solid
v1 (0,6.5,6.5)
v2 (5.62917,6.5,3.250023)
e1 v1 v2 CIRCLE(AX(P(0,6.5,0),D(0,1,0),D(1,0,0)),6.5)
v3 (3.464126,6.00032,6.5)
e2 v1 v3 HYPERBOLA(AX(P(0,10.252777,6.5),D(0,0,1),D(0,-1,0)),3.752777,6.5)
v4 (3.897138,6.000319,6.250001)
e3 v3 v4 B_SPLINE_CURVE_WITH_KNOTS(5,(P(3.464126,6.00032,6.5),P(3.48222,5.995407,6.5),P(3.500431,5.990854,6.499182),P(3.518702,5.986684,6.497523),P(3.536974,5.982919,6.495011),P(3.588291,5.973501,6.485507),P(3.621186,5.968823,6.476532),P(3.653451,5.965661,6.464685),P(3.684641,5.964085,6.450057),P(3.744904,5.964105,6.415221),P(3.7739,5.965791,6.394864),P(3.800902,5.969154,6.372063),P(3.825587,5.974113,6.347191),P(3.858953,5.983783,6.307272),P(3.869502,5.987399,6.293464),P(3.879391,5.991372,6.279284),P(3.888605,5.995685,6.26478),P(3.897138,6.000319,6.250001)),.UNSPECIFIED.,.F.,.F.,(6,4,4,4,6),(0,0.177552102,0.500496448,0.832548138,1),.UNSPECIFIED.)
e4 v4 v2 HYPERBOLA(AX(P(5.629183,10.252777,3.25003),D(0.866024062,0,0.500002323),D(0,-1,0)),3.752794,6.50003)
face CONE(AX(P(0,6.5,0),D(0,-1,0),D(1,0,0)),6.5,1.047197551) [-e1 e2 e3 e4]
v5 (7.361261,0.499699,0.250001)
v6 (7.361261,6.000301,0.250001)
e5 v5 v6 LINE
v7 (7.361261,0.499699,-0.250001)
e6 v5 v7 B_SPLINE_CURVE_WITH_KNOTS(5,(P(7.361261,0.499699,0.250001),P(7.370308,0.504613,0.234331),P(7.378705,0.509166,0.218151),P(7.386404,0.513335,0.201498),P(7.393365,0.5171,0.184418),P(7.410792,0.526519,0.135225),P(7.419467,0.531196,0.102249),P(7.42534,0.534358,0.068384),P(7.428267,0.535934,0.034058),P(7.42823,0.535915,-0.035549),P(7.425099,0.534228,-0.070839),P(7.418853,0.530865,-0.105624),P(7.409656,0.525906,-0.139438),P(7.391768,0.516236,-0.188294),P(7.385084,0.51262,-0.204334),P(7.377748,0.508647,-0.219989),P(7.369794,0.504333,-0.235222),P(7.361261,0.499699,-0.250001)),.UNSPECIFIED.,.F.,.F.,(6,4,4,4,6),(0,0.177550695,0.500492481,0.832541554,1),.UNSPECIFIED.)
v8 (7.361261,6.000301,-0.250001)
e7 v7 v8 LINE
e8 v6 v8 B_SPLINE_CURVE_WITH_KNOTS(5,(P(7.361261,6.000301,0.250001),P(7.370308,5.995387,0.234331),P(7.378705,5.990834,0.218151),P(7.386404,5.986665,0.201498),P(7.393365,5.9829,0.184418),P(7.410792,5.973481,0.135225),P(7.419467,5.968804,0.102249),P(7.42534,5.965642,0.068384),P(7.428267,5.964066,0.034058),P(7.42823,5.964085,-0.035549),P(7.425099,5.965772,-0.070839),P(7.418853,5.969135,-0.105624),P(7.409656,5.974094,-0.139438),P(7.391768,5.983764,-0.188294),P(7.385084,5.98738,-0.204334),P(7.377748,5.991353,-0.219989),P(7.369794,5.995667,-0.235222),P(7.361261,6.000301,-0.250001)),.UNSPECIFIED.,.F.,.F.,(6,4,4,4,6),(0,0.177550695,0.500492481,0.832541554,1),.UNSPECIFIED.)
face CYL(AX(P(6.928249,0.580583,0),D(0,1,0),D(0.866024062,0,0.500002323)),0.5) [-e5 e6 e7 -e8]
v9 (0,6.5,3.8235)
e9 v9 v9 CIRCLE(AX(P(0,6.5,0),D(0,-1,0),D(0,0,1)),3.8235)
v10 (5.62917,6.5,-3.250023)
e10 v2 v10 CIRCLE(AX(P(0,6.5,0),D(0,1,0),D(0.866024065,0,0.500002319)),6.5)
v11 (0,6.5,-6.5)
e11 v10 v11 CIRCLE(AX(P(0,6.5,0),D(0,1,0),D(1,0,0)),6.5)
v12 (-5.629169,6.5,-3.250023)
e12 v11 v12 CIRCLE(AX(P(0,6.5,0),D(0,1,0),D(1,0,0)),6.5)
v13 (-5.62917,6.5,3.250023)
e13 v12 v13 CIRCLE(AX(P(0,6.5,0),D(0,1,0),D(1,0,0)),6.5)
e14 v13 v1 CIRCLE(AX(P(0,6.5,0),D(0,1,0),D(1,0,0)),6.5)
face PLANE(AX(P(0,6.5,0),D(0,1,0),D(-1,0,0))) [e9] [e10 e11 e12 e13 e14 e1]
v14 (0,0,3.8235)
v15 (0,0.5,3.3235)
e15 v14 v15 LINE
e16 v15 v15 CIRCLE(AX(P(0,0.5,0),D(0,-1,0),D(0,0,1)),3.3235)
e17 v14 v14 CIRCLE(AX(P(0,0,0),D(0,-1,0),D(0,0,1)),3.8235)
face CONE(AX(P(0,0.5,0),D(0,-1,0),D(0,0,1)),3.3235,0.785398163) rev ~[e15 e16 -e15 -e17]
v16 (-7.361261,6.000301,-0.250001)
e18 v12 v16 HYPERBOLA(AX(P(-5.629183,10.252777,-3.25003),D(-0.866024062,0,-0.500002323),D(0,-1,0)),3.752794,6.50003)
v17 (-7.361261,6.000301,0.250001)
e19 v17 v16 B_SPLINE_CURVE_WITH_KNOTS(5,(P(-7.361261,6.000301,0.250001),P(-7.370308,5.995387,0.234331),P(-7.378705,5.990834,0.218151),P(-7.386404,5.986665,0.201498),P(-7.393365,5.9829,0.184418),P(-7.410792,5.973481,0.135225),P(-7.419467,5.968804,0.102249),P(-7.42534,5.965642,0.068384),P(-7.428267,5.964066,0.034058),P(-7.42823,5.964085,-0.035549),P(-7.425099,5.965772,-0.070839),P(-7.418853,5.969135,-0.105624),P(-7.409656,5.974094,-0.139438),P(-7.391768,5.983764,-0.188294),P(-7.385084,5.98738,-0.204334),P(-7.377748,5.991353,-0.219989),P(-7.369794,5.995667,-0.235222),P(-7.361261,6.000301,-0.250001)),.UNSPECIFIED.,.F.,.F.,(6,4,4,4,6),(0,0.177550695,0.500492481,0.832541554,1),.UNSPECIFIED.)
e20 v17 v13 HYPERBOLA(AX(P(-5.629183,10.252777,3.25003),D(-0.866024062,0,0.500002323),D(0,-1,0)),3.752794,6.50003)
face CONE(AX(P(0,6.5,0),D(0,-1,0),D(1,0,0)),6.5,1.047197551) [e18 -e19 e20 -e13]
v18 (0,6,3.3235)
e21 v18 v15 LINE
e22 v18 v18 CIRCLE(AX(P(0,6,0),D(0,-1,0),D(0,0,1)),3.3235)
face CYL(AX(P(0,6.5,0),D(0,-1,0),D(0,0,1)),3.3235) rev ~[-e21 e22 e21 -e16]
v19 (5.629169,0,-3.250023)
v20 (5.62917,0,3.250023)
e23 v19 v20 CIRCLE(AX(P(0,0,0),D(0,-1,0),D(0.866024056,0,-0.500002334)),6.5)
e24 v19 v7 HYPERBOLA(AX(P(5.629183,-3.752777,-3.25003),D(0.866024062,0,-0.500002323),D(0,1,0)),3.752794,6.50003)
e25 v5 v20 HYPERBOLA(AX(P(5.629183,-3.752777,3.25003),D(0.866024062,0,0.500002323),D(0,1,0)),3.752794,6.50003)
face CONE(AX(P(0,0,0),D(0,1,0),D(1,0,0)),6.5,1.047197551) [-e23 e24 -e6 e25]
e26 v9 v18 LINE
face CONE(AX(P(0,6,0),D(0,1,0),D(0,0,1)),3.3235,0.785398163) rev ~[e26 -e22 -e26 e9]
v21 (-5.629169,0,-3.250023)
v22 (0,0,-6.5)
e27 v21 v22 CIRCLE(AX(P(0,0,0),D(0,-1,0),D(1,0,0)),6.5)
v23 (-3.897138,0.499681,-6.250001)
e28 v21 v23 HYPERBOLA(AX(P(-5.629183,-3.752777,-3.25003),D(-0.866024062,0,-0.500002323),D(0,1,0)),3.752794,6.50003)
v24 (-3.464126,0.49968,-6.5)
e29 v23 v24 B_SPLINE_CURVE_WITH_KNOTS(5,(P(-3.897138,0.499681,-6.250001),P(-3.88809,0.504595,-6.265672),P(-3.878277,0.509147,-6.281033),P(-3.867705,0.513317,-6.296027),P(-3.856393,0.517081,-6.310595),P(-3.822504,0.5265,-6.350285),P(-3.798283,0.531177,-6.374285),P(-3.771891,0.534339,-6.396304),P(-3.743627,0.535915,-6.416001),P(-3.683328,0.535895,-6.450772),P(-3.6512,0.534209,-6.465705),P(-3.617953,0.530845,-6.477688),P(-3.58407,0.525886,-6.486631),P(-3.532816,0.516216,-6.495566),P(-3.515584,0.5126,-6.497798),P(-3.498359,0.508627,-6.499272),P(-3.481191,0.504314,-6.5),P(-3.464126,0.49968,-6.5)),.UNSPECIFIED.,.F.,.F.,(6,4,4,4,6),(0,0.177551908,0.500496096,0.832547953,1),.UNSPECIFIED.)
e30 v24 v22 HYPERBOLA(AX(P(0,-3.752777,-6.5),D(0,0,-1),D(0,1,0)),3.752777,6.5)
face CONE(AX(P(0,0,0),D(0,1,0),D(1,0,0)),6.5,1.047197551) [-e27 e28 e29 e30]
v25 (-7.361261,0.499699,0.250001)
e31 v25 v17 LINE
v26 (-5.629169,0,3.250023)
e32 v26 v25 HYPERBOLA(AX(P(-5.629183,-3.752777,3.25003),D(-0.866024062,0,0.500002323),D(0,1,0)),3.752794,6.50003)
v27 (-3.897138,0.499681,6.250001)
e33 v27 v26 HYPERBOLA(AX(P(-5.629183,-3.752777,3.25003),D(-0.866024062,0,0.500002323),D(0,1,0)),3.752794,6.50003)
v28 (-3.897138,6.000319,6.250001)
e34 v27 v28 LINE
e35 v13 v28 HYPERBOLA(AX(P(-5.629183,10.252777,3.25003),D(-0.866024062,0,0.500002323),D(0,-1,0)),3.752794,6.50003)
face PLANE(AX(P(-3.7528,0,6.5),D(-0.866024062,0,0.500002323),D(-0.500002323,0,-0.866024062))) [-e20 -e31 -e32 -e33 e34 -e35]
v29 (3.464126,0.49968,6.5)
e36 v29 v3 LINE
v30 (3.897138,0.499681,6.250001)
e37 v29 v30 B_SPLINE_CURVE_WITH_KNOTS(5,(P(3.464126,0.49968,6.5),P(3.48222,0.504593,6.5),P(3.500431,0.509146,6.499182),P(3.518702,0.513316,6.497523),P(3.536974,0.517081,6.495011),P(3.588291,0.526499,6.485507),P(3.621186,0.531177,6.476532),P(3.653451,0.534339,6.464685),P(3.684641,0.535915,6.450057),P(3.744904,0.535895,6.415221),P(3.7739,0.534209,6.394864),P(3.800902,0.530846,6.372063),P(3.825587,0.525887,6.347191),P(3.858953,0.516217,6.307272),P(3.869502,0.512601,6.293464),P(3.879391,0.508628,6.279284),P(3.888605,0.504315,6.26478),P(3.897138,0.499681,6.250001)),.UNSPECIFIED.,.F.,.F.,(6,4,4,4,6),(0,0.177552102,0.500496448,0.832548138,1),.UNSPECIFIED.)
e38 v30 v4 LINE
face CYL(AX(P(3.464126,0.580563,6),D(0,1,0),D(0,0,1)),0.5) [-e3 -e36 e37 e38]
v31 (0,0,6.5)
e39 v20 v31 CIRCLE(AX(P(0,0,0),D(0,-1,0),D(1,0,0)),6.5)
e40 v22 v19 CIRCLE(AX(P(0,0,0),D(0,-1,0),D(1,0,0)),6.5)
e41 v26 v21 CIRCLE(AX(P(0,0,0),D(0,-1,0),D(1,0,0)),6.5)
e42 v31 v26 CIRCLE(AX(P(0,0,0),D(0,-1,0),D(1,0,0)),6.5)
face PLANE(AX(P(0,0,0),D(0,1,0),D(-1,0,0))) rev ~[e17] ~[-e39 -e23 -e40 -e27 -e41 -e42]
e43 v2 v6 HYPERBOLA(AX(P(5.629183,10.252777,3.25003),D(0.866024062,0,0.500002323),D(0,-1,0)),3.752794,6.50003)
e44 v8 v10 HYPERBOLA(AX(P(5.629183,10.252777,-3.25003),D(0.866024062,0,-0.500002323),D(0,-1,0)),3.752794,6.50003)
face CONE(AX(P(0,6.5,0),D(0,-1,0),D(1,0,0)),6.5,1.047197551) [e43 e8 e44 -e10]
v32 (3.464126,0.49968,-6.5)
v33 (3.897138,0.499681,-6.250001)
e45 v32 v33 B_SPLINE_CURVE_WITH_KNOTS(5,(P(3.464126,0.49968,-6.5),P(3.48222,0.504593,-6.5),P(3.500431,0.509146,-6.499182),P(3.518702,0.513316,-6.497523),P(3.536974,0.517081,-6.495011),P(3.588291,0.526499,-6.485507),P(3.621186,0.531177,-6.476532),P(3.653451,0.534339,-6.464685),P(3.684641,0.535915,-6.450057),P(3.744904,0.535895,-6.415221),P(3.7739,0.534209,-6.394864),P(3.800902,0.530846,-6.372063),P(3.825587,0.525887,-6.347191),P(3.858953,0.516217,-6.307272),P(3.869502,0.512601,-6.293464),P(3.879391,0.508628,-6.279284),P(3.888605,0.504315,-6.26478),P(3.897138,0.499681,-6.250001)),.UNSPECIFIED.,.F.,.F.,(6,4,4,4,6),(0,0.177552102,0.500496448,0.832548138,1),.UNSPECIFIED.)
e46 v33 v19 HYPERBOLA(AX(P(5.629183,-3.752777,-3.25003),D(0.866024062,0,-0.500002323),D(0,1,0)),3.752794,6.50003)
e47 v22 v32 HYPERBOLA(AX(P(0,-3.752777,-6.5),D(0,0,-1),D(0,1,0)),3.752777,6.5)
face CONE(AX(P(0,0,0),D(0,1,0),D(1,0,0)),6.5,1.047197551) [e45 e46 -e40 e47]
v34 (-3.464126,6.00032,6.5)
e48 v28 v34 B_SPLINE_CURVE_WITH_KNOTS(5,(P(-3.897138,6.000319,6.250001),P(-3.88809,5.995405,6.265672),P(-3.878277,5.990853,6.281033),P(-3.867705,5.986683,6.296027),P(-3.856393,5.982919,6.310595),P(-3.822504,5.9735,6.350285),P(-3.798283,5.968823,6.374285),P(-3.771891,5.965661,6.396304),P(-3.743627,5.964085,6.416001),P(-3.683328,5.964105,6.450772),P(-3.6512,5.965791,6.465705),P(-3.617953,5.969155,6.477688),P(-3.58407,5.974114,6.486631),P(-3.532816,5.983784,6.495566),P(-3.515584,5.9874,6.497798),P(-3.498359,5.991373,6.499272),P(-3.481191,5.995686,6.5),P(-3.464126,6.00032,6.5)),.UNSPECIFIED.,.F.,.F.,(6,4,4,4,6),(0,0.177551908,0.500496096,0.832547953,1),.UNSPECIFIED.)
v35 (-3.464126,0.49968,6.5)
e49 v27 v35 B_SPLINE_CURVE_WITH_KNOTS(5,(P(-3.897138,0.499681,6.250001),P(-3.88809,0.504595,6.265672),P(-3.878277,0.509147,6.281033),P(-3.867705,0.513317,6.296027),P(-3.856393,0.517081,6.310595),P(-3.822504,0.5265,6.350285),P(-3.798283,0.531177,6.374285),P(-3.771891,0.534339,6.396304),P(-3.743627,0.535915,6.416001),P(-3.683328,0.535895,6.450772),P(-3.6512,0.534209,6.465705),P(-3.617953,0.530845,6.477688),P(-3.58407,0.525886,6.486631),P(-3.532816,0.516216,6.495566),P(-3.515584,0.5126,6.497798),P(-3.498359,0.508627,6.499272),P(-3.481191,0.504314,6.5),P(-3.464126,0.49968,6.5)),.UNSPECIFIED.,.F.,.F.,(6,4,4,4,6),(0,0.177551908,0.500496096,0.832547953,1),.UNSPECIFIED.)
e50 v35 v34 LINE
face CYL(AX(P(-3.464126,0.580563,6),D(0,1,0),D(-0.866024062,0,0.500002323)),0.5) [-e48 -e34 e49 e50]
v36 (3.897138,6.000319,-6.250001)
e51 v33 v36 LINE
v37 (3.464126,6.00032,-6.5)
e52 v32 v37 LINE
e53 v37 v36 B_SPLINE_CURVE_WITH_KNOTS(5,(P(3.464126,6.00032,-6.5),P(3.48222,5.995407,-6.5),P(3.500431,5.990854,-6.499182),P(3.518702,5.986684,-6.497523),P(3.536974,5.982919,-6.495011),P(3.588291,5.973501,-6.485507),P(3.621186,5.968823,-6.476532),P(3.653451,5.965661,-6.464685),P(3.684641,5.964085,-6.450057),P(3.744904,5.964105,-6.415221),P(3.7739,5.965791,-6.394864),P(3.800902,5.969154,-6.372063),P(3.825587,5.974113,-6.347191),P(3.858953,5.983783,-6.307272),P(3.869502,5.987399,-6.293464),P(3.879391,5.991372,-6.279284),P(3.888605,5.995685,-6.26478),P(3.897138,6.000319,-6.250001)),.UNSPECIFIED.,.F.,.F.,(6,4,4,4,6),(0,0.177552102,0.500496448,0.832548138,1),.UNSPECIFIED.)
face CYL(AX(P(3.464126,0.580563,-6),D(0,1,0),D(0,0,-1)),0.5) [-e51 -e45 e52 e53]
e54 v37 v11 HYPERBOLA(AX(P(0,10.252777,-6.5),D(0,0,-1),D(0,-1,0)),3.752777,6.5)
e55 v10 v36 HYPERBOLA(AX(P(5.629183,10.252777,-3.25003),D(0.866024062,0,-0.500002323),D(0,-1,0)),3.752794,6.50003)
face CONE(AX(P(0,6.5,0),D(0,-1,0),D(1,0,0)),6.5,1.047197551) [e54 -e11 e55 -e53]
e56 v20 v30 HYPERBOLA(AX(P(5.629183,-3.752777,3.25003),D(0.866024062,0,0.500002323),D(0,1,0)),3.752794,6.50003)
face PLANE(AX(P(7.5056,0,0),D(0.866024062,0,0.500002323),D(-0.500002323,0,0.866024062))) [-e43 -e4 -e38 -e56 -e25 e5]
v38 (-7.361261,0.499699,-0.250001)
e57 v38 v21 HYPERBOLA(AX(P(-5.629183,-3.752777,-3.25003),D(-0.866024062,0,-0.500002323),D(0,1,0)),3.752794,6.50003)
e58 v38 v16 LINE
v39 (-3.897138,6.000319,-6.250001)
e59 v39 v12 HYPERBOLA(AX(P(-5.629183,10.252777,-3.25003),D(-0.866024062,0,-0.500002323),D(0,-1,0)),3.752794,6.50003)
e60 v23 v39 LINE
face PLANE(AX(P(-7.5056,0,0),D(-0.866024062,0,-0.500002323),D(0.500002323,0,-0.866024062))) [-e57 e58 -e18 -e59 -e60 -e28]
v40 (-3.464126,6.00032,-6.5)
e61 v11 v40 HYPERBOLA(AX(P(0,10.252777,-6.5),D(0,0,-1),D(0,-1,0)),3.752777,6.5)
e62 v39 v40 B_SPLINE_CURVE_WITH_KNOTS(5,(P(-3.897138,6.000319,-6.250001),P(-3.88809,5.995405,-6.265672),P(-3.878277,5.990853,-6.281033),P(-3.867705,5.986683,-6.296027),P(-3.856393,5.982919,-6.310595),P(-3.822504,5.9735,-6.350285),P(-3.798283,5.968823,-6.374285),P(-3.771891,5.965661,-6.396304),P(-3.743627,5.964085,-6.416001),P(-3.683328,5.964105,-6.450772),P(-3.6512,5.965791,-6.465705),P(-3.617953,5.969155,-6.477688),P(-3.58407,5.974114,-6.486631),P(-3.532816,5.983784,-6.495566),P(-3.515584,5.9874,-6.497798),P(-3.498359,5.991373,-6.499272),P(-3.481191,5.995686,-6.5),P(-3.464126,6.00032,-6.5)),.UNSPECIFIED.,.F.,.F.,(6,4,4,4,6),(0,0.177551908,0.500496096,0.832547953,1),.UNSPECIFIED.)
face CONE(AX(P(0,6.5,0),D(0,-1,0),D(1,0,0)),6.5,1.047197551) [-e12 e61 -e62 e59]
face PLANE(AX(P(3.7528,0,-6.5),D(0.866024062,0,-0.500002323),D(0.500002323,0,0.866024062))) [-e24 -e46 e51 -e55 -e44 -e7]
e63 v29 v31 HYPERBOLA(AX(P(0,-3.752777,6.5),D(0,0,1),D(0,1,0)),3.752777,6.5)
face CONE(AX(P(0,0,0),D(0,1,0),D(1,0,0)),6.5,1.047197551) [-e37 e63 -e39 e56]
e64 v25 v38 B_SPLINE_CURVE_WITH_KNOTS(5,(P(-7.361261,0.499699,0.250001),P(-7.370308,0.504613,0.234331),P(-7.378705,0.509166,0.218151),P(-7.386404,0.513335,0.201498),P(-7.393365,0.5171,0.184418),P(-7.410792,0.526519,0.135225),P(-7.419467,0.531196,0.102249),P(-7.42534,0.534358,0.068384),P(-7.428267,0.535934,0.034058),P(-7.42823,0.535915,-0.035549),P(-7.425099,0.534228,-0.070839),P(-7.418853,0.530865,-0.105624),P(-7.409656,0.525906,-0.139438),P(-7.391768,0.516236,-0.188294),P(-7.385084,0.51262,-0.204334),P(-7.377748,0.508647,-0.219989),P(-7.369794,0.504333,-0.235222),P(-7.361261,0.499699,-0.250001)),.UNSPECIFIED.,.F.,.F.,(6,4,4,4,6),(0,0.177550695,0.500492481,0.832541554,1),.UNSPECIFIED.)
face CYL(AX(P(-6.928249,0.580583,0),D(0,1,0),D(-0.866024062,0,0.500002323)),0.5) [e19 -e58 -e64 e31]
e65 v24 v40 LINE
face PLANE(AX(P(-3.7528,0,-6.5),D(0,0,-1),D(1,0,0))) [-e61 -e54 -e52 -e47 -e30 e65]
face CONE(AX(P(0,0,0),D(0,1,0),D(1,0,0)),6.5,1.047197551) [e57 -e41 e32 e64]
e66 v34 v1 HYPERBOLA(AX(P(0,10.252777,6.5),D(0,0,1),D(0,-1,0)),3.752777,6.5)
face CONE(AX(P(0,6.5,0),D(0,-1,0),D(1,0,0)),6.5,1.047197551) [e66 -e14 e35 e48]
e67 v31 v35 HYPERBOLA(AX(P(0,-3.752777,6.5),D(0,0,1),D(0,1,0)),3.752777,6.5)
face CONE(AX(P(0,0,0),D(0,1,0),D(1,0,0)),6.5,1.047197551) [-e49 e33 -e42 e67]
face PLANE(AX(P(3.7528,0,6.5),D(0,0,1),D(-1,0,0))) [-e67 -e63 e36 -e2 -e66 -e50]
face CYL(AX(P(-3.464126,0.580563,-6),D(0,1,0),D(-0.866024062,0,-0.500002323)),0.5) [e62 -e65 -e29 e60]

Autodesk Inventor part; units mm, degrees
ref_plane "YZ Plane" through (0, 0, 0) normal (1, 0, 0) x (0, 1, 0)
ref_plane "XZ Plane" through (0, 0, 0) normal (0, 1, 0) x (-1, 0, 0)
ref_plane "XY Plane" through (0, 0, 0) normal (0, 0, 1) x (1, 0, 0)
sketch "Sketch1" plane through (0, 0, 0) normal (0, 1, 0) x (-1, 0, 0)
  line L0 (3.7528, 6.5) -> (7.5056, 0)
  line L1 (7.5056, 0) -> (3.7528, -6.5)
  line L2 (3.7528, -6.5) -> (-3.7528, -6.5)
  line L3 (-3.7528, -6.5) -> (-7.5056, 0)
  line L4 (-7.5056, 0) -> (-3.7528, 6.5)
  line L5 (-3.7528, 6.5) -> (3.7528, 6.5)
  point P0 (0, 0)
  point P1 (0, 0)
  dimension "d0" = 6.5
extrude "Extrusion1" add sketch "Sketch1" along normal blind 6.5
sketch "Sketch2" plane through (0, 6.5, 0) normal (0, 1, 0) x (1, 0, 0)
  point P0 (0, 0)
hole "Hole1" at (0, 6.5, 0) direction (0, -1, 0) diameter 6.647 depth 8 tip angle 118 thread size "M8x1.25" class "6H" standard "ISO Metric profile"
sketch "Sketch3" plane through (0, 6.5, 0) normal (0, 1, 0) x (1, 0, 0)
  circle A0 centre (0, 0) radius 3.3235 projected
  circle A1 centre (0, 0) radius 6.5
  circle A2 centre (0, 0) radius 29.8584
extrude "Extrusion2" cut sketch "Sketch3" against normal blind 1 draft -60 contours A2
sketch "Sketch4" plane through (0, 0, 0) normal (0, -1, 0) x (1, 0, 0)
  circle A0 centre (0, 0) radius 3.3235 projected
  circle A1 centre (0, 0) radius 6.5
  circle A2 centre (0, 0) radius 18
extrude "Extrusion3" cut sketch "Sketch4" against normal blind 1 draft -60 contours A2
fillet "Fillet1" radius 0.5 6 edges at (-7.5056, 3.25, 0) (-3.7528, 3.25, 6.5) (3.7528, 3.25, 6.5) (7.5056, 3.25, 0) (3.7528, 3.25, -6.5) (-3.7528, 3.25, -6.5)
chamfer "Chamfer1" distance 0.5 angle 45 2 edges at (0, 6.5, -3.3235) (0, 0, -3.3235)
properties part number "bed nut" material "Stainless Steel"
